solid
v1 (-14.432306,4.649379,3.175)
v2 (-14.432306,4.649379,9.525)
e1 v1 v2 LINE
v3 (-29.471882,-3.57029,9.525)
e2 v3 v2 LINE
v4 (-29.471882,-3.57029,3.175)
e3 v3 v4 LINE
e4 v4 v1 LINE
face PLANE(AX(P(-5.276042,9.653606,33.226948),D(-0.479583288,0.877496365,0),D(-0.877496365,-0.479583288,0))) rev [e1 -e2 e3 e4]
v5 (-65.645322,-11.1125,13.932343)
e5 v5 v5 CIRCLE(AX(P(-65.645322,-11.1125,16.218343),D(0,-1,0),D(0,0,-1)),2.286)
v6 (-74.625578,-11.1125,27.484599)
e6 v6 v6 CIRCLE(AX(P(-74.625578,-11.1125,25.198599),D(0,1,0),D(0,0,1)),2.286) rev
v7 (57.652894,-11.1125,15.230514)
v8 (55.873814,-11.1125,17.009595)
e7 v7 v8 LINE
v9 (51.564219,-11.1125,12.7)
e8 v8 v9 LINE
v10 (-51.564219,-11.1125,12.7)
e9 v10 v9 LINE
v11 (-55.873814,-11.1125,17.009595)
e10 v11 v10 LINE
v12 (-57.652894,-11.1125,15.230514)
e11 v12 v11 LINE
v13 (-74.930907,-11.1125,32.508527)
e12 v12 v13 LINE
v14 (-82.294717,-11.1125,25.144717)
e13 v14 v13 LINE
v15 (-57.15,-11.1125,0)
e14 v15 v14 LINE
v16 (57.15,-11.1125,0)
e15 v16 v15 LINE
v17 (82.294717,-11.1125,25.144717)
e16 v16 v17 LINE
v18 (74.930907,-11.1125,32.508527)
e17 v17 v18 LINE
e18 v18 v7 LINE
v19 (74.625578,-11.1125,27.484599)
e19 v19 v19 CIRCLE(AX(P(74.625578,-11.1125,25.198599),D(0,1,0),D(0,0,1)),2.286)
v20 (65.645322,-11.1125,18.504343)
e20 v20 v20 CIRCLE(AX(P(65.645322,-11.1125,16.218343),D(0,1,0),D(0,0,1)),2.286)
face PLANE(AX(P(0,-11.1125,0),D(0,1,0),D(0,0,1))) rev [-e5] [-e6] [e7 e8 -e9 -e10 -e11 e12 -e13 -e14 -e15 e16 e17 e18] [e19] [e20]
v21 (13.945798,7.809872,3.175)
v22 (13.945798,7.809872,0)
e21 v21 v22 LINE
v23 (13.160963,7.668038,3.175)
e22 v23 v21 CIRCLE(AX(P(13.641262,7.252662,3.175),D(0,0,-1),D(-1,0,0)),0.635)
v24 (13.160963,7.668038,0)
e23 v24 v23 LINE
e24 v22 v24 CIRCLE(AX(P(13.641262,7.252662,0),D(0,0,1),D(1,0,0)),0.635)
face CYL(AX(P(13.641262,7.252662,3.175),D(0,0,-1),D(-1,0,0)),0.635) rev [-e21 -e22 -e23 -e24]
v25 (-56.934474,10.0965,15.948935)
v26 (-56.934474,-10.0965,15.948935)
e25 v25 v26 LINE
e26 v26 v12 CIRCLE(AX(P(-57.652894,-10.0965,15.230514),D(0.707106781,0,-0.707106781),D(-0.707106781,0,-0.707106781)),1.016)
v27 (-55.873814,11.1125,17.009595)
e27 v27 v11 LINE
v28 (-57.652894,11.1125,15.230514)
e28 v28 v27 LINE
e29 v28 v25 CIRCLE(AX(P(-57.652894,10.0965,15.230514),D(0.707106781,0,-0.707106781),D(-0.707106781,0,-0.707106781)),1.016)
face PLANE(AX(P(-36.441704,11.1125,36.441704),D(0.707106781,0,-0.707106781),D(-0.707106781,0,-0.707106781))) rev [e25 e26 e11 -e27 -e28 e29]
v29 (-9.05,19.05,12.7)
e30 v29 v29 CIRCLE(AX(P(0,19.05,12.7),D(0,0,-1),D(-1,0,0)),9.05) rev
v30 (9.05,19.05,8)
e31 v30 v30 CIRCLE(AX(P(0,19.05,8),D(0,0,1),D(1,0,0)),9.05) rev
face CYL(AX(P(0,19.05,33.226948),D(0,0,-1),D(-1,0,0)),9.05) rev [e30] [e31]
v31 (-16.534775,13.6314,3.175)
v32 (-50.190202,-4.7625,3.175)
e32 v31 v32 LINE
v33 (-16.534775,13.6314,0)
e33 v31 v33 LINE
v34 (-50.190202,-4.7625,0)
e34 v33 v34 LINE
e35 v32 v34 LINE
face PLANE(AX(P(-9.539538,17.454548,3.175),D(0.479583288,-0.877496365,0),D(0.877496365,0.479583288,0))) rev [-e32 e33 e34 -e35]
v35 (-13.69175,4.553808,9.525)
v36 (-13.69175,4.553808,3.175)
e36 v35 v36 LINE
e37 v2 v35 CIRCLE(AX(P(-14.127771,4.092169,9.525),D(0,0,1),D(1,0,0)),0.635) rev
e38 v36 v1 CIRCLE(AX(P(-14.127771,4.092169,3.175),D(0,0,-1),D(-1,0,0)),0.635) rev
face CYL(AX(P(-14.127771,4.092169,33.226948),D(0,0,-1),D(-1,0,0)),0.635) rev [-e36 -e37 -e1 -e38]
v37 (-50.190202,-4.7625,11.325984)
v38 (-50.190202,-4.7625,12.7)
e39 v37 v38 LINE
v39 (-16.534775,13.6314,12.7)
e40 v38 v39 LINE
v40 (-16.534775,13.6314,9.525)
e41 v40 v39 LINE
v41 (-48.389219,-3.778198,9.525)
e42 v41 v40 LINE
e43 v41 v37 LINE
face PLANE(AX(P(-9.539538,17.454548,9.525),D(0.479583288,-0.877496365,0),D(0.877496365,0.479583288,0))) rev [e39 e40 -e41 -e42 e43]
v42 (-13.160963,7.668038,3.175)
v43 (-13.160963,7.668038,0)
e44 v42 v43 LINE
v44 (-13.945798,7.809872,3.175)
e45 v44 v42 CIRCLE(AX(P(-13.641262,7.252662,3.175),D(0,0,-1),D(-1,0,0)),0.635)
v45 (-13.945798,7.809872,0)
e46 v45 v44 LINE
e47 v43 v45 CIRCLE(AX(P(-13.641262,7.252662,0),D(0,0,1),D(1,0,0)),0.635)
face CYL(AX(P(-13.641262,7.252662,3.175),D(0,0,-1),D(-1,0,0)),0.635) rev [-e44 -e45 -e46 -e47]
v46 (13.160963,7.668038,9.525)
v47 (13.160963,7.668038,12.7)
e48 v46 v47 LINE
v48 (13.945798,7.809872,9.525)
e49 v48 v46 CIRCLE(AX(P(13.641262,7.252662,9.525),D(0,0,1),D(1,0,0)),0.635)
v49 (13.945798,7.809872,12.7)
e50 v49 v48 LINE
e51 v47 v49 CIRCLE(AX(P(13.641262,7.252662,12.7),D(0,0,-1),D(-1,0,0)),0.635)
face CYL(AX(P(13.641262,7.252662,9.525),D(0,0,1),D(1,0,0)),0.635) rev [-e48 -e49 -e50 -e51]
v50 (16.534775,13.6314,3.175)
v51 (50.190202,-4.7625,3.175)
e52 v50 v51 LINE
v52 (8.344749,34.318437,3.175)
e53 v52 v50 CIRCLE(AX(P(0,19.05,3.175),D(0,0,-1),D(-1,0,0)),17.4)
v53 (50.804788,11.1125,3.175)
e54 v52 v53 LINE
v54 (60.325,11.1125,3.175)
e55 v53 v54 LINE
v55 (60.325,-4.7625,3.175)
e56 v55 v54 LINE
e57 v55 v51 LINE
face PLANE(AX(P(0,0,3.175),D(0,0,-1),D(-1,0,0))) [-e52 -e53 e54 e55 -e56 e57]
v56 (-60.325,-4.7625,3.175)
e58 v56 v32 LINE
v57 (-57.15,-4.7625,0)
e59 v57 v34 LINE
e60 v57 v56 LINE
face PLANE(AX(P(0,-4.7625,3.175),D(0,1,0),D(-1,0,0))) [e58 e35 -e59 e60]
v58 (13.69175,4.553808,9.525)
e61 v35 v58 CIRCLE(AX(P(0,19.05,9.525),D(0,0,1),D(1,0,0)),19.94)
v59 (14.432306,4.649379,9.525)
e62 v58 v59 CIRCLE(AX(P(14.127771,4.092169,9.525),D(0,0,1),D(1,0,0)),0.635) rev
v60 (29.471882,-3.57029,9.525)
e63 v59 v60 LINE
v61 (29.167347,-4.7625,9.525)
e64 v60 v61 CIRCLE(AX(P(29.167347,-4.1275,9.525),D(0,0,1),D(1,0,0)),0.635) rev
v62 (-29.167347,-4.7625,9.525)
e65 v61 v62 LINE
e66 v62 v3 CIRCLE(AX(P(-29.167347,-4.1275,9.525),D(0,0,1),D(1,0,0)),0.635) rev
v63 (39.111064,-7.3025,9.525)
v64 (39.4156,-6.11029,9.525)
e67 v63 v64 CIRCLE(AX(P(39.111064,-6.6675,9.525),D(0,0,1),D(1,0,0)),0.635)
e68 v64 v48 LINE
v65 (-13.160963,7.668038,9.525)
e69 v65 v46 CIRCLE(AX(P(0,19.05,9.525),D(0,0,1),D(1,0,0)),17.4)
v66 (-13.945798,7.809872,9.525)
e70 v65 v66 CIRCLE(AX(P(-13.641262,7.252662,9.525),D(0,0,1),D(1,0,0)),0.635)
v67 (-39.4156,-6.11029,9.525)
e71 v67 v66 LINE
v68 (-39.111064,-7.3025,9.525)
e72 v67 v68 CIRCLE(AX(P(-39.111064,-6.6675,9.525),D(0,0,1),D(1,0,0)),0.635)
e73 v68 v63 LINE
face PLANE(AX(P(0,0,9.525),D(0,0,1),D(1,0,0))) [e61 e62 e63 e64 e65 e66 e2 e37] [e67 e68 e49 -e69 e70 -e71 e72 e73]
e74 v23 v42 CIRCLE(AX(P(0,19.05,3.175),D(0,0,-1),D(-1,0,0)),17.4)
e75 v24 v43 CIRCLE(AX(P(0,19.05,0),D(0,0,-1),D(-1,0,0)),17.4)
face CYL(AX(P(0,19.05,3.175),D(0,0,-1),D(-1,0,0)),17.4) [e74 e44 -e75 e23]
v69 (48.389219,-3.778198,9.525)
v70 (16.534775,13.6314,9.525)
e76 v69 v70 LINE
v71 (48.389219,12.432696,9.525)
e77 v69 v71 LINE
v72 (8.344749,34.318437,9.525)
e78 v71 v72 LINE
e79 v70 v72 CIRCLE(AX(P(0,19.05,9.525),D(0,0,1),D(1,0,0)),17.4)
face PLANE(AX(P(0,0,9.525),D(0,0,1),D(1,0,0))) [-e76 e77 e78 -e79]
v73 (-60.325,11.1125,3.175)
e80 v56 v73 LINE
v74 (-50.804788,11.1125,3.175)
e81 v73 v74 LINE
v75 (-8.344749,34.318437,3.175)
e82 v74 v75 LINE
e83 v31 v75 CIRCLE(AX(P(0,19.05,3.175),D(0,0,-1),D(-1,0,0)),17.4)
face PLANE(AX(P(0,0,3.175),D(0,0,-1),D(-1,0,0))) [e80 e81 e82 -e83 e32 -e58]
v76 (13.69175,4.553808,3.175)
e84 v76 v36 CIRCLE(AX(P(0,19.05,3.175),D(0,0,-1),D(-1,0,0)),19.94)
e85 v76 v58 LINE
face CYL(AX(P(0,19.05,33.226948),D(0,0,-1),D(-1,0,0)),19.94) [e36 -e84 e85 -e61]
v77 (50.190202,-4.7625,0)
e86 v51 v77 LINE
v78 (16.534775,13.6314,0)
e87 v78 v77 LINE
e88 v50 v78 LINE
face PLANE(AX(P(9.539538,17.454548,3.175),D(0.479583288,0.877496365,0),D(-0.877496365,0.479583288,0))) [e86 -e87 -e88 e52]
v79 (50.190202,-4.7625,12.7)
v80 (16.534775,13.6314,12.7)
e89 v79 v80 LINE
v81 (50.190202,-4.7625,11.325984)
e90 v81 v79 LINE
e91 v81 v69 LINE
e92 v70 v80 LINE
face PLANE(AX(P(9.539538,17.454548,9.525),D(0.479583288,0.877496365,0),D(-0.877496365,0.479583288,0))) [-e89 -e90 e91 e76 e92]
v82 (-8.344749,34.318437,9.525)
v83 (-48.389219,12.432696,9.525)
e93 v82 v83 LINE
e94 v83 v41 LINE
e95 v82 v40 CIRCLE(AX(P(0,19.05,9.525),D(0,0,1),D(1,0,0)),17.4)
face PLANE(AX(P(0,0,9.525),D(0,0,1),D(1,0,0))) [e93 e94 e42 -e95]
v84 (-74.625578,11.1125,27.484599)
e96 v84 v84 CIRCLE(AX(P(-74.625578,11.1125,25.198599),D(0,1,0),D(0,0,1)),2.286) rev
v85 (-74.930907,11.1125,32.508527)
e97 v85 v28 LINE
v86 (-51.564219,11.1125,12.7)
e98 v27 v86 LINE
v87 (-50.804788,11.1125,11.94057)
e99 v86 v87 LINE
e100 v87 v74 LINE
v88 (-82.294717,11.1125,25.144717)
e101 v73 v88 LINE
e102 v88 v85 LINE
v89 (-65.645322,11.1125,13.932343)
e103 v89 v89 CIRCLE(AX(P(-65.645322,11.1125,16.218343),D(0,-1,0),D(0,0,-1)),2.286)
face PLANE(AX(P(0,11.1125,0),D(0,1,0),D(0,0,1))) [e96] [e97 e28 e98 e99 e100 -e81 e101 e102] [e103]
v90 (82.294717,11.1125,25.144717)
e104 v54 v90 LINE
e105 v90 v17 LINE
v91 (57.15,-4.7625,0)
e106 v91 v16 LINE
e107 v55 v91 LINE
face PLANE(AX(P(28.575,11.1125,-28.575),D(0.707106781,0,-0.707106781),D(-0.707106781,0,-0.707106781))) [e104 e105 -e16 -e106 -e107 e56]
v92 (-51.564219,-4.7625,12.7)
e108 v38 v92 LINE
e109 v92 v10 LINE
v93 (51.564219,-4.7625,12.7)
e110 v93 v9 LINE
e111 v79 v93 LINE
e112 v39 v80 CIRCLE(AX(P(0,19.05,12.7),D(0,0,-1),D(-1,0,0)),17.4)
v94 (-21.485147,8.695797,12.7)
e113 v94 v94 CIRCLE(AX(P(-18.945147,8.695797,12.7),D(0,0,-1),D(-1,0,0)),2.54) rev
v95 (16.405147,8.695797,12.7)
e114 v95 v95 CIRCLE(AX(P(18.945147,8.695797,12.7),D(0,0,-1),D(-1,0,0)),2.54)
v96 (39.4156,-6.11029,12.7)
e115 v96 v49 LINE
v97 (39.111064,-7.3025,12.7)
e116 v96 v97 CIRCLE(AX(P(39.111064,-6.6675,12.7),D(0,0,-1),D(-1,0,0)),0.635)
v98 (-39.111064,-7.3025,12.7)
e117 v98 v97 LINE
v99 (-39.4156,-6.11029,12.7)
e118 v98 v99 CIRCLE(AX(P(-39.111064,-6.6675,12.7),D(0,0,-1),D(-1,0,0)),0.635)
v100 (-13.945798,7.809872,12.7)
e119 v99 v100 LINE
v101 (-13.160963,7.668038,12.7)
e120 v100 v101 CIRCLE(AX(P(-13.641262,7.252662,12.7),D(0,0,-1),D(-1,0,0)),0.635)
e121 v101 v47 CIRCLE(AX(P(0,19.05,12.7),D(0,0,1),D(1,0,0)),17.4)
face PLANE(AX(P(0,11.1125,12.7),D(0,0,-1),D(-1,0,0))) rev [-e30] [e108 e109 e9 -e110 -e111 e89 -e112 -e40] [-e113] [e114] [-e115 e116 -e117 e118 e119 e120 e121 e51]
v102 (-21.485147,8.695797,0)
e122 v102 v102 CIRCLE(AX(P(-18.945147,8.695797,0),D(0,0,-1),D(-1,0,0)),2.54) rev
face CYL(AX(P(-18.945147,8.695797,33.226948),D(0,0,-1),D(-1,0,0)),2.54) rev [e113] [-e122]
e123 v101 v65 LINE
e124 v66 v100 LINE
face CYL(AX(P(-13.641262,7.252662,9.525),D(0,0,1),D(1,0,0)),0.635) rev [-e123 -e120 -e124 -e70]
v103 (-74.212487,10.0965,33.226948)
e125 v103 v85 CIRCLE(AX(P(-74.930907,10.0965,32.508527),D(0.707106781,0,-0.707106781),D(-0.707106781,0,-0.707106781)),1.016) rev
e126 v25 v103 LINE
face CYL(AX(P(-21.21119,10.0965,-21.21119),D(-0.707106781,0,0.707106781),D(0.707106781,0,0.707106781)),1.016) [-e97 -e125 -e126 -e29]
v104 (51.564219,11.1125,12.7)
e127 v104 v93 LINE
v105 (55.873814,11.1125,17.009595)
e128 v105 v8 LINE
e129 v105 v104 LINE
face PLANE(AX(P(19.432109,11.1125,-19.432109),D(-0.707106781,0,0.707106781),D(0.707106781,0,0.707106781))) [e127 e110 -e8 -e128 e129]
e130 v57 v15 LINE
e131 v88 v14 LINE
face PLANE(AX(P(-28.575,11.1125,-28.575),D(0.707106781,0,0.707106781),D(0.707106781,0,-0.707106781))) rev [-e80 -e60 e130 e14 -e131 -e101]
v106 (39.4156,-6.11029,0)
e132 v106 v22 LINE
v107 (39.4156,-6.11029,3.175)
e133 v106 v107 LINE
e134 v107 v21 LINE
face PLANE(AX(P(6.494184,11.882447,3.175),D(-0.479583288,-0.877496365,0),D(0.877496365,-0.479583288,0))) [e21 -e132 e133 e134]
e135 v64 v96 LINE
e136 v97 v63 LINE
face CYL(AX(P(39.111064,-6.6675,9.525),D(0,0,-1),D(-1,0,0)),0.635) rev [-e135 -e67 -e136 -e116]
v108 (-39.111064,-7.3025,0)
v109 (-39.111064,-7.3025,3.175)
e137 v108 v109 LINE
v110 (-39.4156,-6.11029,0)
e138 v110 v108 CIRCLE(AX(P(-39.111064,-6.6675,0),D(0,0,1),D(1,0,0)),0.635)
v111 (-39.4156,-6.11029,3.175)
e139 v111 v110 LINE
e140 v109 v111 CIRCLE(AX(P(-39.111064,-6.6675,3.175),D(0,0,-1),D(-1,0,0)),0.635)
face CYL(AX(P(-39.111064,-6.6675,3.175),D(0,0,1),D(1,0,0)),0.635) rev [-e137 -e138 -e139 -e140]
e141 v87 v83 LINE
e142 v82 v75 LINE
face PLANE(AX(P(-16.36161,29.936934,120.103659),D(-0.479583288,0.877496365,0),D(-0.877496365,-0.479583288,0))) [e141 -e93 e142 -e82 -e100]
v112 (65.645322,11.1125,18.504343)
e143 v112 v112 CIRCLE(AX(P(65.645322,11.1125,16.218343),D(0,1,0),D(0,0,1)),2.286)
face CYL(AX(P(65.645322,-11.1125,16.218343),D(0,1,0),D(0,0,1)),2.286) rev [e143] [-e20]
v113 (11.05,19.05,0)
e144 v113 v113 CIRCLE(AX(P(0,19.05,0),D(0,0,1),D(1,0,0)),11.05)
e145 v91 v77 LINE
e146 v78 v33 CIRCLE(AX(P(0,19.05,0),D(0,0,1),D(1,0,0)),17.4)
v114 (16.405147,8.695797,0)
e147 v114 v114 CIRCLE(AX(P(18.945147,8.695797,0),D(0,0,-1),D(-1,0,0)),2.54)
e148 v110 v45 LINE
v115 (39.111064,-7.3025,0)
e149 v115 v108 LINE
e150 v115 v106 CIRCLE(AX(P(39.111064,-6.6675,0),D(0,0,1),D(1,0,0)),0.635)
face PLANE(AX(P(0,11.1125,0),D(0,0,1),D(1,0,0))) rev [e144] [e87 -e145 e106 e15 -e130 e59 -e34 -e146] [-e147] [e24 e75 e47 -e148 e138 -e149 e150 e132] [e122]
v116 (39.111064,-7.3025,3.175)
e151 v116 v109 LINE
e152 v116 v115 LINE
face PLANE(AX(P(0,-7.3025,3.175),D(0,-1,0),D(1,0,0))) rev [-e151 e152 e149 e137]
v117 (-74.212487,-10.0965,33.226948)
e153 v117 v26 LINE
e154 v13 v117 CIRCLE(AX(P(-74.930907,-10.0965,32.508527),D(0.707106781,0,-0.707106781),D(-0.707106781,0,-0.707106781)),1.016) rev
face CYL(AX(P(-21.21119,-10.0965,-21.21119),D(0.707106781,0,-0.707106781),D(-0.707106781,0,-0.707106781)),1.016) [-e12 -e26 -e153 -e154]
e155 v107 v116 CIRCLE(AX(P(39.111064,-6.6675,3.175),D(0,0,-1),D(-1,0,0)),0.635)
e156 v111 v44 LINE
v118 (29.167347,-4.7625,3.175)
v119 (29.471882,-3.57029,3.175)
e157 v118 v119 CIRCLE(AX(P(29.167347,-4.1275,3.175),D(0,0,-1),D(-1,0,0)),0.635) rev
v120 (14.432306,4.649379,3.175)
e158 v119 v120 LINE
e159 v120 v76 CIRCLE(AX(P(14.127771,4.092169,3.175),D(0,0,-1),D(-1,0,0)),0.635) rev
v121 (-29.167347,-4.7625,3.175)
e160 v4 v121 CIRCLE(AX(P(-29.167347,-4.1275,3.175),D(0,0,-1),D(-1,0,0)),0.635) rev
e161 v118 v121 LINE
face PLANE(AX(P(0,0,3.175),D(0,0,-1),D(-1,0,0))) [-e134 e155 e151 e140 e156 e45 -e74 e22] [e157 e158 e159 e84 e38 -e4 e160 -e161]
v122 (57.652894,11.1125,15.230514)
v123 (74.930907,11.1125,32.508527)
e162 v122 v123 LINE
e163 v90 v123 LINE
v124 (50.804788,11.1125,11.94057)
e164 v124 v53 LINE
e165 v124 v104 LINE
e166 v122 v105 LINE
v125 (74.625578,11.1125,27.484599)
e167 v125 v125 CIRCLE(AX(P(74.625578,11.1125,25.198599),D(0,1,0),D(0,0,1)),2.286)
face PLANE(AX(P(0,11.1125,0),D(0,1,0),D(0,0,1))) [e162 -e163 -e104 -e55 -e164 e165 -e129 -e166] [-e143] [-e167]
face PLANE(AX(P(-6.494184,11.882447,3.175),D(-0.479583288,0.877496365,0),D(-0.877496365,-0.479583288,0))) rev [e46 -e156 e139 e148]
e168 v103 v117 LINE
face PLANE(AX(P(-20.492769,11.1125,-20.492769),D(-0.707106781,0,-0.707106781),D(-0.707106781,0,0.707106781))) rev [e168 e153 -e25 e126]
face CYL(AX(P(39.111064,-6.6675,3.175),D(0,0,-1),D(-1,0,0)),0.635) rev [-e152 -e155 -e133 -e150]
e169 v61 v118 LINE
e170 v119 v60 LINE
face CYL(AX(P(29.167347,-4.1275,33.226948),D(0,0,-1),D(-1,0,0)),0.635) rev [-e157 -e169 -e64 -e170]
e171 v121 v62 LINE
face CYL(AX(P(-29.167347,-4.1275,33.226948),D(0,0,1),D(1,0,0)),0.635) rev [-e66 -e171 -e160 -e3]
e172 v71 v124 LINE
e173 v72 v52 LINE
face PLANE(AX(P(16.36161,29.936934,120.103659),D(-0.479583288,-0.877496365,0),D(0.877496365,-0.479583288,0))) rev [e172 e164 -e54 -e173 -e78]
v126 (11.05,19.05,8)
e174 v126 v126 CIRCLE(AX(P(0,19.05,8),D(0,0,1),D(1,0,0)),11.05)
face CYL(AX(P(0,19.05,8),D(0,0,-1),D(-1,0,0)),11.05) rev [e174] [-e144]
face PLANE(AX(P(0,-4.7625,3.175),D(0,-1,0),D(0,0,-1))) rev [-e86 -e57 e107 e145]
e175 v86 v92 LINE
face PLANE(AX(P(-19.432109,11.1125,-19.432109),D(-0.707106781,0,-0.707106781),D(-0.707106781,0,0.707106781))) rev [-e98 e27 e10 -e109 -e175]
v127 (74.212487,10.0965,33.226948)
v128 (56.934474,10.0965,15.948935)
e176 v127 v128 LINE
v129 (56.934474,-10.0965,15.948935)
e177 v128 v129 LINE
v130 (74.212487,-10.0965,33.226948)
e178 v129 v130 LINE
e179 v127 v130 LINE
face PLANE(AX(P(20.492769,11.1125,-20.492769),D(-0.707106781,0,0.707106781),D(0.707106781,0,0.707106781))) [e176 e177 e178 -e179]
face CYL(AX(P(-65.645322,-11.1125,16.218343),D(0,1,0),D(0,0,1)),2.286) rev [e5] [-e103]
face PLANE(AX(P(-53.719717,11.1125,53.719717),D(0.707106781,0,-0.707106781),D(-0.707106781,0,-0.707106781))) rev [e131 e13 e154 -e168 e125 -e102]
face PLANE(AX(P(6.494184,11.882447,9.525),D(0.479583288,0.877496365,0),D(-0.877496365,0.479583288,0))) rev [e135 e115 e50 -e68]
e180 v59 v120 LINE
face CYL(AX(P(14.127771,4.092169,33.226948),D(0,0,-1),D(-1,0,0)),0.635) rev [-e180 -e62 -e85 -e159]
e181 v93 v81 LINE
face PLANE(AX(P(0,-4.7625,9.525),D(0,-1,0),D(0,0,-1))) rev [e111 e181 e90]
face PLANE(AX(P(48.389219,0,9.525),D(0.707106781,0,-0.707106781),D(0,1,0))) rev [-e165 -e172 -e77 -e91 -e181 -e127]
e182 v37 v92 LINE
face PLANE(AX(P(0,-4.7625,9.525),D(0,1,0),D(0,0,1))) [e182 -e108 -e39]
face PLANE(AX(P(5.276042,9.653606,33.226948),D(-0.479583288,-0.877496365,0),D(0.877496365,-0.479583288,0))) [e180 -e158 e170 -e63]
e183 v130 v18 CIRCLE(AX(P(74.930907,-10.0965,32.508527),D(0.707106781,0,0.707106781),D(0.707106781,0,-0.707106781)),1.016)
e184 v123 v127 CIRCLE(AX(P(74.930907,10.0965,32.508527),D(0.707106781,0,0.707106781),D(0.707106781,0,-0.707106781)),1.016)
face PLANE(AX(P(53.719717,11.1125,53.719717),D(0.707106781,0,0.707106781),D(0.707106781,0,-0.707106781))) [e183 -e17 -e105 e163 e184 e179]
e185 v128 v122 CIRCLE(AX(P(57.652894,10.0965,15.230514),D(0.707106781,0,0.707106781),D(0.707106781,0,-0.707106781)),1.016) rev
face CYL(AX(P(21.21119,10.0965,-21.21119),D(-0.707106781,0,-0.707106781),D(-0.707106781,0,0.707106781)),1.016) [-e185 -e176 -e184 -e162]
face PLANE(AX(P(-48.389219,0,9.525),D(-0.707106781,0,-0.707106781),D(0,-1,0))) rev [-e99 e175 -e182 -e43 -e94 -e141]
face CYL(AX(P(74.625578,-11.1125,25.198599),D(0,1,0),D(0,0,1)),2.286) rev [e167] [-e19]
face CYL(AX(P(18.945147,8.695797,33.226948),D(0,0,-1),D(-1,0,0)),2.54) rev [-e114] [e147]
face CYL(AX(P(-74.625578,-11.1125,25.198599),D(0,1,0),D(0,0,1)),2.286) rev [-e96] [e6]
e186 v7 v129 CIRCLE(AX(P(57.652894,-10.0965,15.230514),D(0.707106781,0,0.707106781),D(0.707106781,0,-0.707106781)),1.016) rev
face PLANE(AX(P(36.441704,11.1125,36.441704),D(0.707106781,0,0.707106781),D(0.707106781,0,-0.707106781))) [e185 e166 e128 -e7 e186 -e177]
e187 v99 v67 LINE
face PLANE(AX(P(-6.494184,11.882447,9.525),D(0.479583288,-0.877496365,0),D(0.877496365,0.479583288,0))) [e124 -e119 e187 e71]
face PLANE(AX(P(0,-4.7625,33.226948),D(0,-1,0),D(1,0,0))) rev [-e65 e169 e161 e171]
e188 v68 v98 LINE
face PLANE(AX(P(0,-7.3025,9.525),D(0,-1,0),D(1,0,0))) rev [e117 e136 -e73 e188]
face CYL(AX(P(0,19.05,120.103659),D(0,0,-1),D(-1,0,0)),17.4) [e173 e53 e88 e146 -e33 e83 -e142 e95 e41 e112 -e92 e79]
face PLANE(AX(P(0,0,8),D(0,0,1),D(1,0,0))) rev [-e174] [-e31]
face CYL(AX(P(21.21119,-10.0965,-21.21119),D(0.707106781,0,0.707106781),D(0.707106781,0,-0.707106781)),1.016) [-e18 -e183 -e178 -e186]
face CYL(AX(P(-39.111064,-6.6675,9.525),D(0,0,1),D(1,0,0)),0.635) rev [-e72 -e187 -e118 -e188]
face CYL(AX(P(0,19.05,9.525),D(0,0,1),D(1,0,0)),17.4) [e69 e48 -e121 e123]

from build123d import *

# Parameters (mm, degrees)
BOSS_EXTRUDE1_DEPTH = 11.1125
BOSS_EXTRUDE2_DEPTH = 12.7
CUT_EXTRUDE2_DEPTH  = 8
CUT_EXTRUDE3_DEPTH  = 96.942967533
SKETCH5_W           = 25.144717139
SKETCH5_H           = 15.875
CUT_EXTRUDE4_DEPTH  = 3.175
CUT_EXTRUDE5_DEPTH  = 96.942967533
SKETCH6_R           = 2.54
CUT_EXTRUDE6_DEPTH  = 96.942967533
CUT_EXTRUDE7_START  = -3.175
CUT_EXTRUDE7_DEPTH  = 3.175
CHAMFER1_SIZE       = 3.175
FILLET1_R           = 0.635
FILLET3_R           = 1.016
SKETCH8_R           = 2.286
CUT_EXTRUDE8_DEPTH  = 93.295392221


with BuildPart() as part:
    # Sketch3 → Boss-Extrude1 (new, symmetric)
    with BuildSketch(Plane(origin=(0, 0, 0), x_dir=(1, 0, 0), z_dir=(0, 1, 0))):
        Polygon((-56.934473853, -15.948934871), (-65.016704362, -7.866704362), (-82.294717139, -25.144717139), (-74.93090712, -32.508527158), (-74.21248663, -33.226947648), align=None)
        Polygon((-65.016704362, -7.866704362), (-55.873813681, -17.009595043), (-52.371513794, -13.507295156), (-61.514404475, -4.364404475), align=None)
        Polygon((-52.371513794, -13.507295156), (-51.564218639, -12.7), (-17.311249955, -12.7), (0, -12.7), (0, 0), (-17.311249955, 0), (-57.15, 0), (-60.325, -3.175), (-61.514404475, -4.364404475), align=None)
        Polygon((0, 0), (0, -12.7), (17.311249955, -12.7), (51.564218639, -12.7), (52.371513794, -13.507295156), (61.514404475, -4.364404475), (60.325, -3.175), (57.15, 0), (17.311249955, 0), align=None)
        Polygon((61.514404475, -4.364404475), (65.016704362, -7.866704362), (55.873813681, -17.009595043), (52.371513794, -13.507295156), align=None)
        Polygon((65.016704362, -7.866704362), (56.934473853, -15.948934871), (74.21248663, -33.226947648), (74.93090712, -32.508527158), (82.294717139, -25.144717139), align=None)
    extrude(amount=BOSS_EXTRUDE1_DEPTH, both=True)

    # Sketch2 → Boss-Extrude2 (add)
    with BuildSketch(Plane.XY):
        with BuildLine():
            Line((-50.804788276, 11.1125), (50.804788276, 11.1125))
            Line((50.804788276, 11.1125), (8.344749207, 34.318436746))
            ThreePointArc((8.344749207, 34.318436746), (0, 36.45), (-8.344749207, 34.318436746))
            Line((-8.344749207, 34.318436746), (-50.804788276, 11.1125))
        make_face()
    extrude(amount=BOSS_EXTRUDE2_DEPTH)

    # Sketch2<3> → Cut-Extrude2 (cut)
    with BuildSketch(Plane.XY):
        with BuildLine():
            ThreePointArc((0, 30.1), (-11.05, 19.05), (0, 8))
            Line((0, 8), (0, 10))
            ThreePointArc((0, 10), (-9.05, 19.05), (0, 28.1))
            Line((0, 28.1), (0, 30.1))
        make_face()
        with BuildLine():
            Line((0, 10), (0, 8))
            ThreePointArc((0, 8), (7.813529932, 11.236470068), (11.05, 19.05))
            ThreePointArc((11.05, 19.05), (7.813529932, 26.863529932), (0, 30.1))
            Line((0, 30.1), (0, 28.1))
            ThreePointArc((0, 28.1), (6.39931637, 25.44931637), (9.05, 19.05))
            ThreePointArc((9.05, 19.05), (6.39931637, 12.65068363), (0, 10))
        make_face()
        with BuildLine():
            ThreePointArc((0, 28.1), (-9.05, 19.05), (0, 10))
            Line((0, 10), (0, 28.1))
        make_face()
        with BuildLine():
            Line((0, 28.1), (0, 10))
            ThreePointArc((0, 10), (6.39931637, 12.65068363), (9.05, 19.05))
            ThreePointArc((9.05, 19.05), (6.39931637, 25.44931637), (0, 28.1))
        make_face()
    extrude(amount=CUT_EXTRUDE2_DEPTH, mode=Mode.SUBTRACT)

    # Sketch2<5> → Cut-Extrude3 (cut, through all)
    with BuildSketch(Plane.XY):
        with BuildLine():
            ThreePointArc((0, 28.1), (-9.05, 19.05), (0, 10))
            Line((0, 10), (0, 28.1))
        make_face()
        with BuildLine():
            Line((0, 28.1), (0, 10))
            ThreePointArc((0, 10), (6.39931637, 12.65068363), (9.05, 19.05))
            ThreePointArc((9.05, 19.05), (6.39931637, 25.44931637), (0, 28.1))
        make_face()
    extrude(amount=CUT_EXTRUDE3_DEPTH, mode=Mode.SUBTRACT)

    # Sketch5 → Cut-Extrude4 (cut)
    # profile 1 of 5: a face of its own
    with BuildSketch(Plane(origin=(0, 0, 0), x_dir=(-1, 0, 0), z_dir=(0, 0, -1))):
        with Locations((-69.72235857, 3.175)):
            Rectangle(SKETCH5_W, SKETCH5_H)
    # profile 2 of 5: a face of its own
    with BuildSketch(Plane(origin=(0, 0, 0), x_dir=(-1, 0, 0), z_dir=(0, 0, -1))):
        with BuildLine():
            Line((-50.190202202, -4.7625), (-16.534774751, 13.631400187))
            ThreePointArc((-16.534774751, 13.631400187), (-16.178258512, 25.454994263), (-8.344749207, 34.318436746))
            Line((-8.344749207, 34.318436746), (-50.804788276, 11.1125))
            Line((-50.804788276, 11.1125), (-57.15, 11.1125))
            Line((-57.15, 11.1125), (-57.15, -4.7625))
            Line((-57.15, -4.7625), (-50.190202202, -4.7625))
        make_face()
    # profile 3 of 5: a face of its own
    with BuildSketch(Plane(origin=(0, 0, 0), x_dir=(-1, 0, 0), z_dir=(0, 0, -1))):
        with BuildLine():
            Line((50.804788276, 11.1125), (8.344749207, 34.318436746))
            ThreePointArc((8.344749207, 34.318436746), (14.965938597, 27.925848236), (17.4, 19.05))
            ThreePointArc((17.4, 19.05), (17.182332215, 16.306378367), (16.534774751, 13.631400187))
            Line((16.534774751, 13.631400187), (50.190202202, -4.7625))
            Line((50.190202202, -4.7625), (57.15, -4.7625))
            Line((57.15, -4.7625), (57.15, 11.1125))
            Line((57.15, 11.1125), (50.804788276, 11.1125))
        make_face()
    # profile 4 of 5: a face of its own
    with BuildSketch(Plane(origin=(0, 0, 0), x_dir=(-1, 0, 0), z_dir=(0, 0, -1))):
        with Locations((69.72235857, 3.175)):
            Rectangle(SKETCH5_W, SKETCH5_H)
    # profile 5 of 5: a face of its own
    with BuildSketch(Plane(origin=(0, 0, 0), x_dir=(-1, 0, 0), z_dir=(0, 0, -1))):
        with BuildLine():
            ThreePointArc((13.489420874, 8.059298271), (0, 1.65), (-13.489420874, 8.059298271))
            Line((-13.489420874, 8.059298271), (-41.5969936, -7.3025))
            Line((-41.5969936, -7.3025), (41.5969936, -7.3025))
            Line((41.5969936, -7.3025), (13.489420874, 8.059298271))
        make_face()
        with BuildLine():
            Line((31.653276027, -4.7625), (-31.653276027, -4.7625))
            Line((-31.653276027, -4.7625), (-14.022402602, 4.873405723))
            ThreePointArc((-14.022402602, 4.873405723), (0, -0.89), (14.022402602, 4.873405723))
            Line((14.022402602, 4.873405723), (31.653276027, -4.7625))
        make_face(mode=Mode.SUBTRACT)
    extrude(amount=-CUT_EXTRUDE4_DEPTH, mode=Mode.SUBTRACT)

    # Sketch5<3> → Cut-Extrude5 (cut, through all)
    with BuildSketch(Plane(origin=(0, 0, 0), x_dir=(-1, 0, 0), z_dir=(0, 0, -1))):
        with BuildLine():
            ThreePointArc((-14.022402602, 4.873405723), (0, -0.89), (14.022402602, 4.873405723))
            Line((14.022402602, 4.873405723), (31.653276027, -4.7625))
            Line((31.653276027, -4.7625), (-31.653276027, -4.7625))
            Line((-31.653276027, -4.7625), (-14.022402602, 4.873405723))
        make_face()
    extrude(amount=-CUT_EXTRUDE5_DEPTH, mode=Mode.SUBTRACT)

    # Sketch6 → Cut-Extrude6 (cut, through all)
    with BuildSketch(Plane(origin=(0, 0, 0), x_dir=(-1, 0, 0), z_dir=(0, 0, -1))):
        with Locations((-18.945146514, 8.695796817)):
            Circle(SKETCH6_R)
        with Locations((18.945146514, 8.695796817)):
            Circle(SKETCH6_R)
    extrude(amount=-CUT_EXTRUDE6_DEPTH, mode=Mode.SUBTRACT)

    # Sketch7 → Cut-Extrude7 (cut)
    # profile 1 of 3: a face of its own
    with BuildSketch(Plane.XY.offset(12.7).offset(CUT_EXTRUDE7_START)):
        with BuildLine():
            ThreePointArc((13.489420874, 8.059298271), (0, 1.65), (-13.489420874, 8.059298271))
            Line((-13.489420874, 8.059298271), (-41.5969936, -7.3025))
            Line((-41.5969936, -7.3025), (41.5969936, -7.3025))
            Line((41.5969936, -7.3025), (13.489420874, 8.059298271))
        make_face()
        with BuildLine():
            Line((-31.653276027, -4.7625), (-14.022402602, 4.873405723))
            ThreePointArc((-14.022402602, 4.873405723), (0, -0.89), (14.022402602, 4.873405723))
            Line((14.022402602, 4.873405723), (31.653276027, -4.7625))
            Line((31.653276027, -4.7625), (-31.653276027, -4.7625))
        make_face(mode=Mode.SUBTRACT)
    # profile 2 of 3: a face of its own
    with BuildSketch(Plane.XY.offset(12.7).offset(CUT_EXTRUDE7_START)):
        with BuildLine():
            Line((-51.564218639, -4.7625), (-50.190202202, -4.7625))
            Line((-50.190202202, -4.7625), (-16.534774751, 13.631400187))
            ThreePointArc((-16.534774751, 13.631400187), (-16.178258512, 25.454994263), (-8.344749207, 34.318436746))
            Line((-8.344749207, 34.318436746), (-50.804788276, 11.1125))
            Line((-50.804788276, 11.1125), (-51.564218639, 11.1125))
            Line((-51.564218639, 11.1125), (-51.564218639, -4.7625))
        make_face()
    # profile 3 of 3: a face of its own
    with BuildSketch(Plane.XY.offset(12.7).offset(CUT_EXTRUDE7_START)):
        with BuildLine():
            Line((50.804788276, 11.1125), (8.344749207, 34.318436746))
            ThreePointArc((8.344749207, 34.318436746), (14.965938597, 27.925848236), (17.4, 19.05))
            ThreePointArc((17.4, 19.05), (17.182332215, 16.306378367), (16.534774751, 13.631400187))
            Line((16.534774751, 13.631400187), (50.190202202, -4.7625))
            Line((50.190202202, -4.7625), (51.564218639, -4.7625))
            Line((51.564218639, -4.7625), (51.564218639, 11.1125))
            Line((51.564218639, 11.1125), (50.804788276, 11.1125))
        make_face()
    extrude(amount=CUT_EXTRUDE7_DEPTH, mode=Mode.SUBTRACT)

    # Chamfer1
    chamfer1_edges = [part.edges().sort_by_distance(p)[0] for p in [
        (51.564218639, 3.175, 9.525),
        (-51.564218639, 3.175, 9.525),
    ]]
    chamfer(chamfer1_edges, length=CHAMFER1_SIZE - 0.0001)  # a hair under: the kernel refuses the full size

    # Fillet1
    fillet1_edges = [part.edges().sort_by_distance(p)[0] for p in [
        (13.489420874, 8.059298271, 1.5875),
        (-13.489420874, 8.059298271, 1.5875),
        (-41.5969936, -7.3025, 1.5875),
        (41.5969936, -7.3025, 1.5875),
        (14.022402602, 4.873405723, 6.35),
        (31.653276027, -4.7625, 6.35),
        (-31.653276027, -4.7625, 6.35),
        (-14.022402602, 4.873405723, 6.35),
        (-13.489420874, 8.059298271, 11.1125),
        (13.489420874, 8.059298271, 11.1125),
        (41.5969936, -7.3025, 11.1125),
        (-41.5969936, -7.3025, 11.1125),
    ]]
    fillet(fillet1_edges, radius=FILLET1_R)

    # Fillet3
    fillet3_edges = [part.edges().sort_by_distance(p)[0] for p in [
        (65.573480242, -11.1125, 24.587941259),
        (-65.573480242, -11.1125, 24.587941259),
        (65.573480242, 11.1125, 24.587941259),
        (-65.573480242, 11.1125, 24.587941259),
    ]]
    fillet(fillet3_edges, radius=FILLET3_R)

    # Sketch8 → Cut-Extrude8 (cut, through all)
    with BuildSketch(Plane(origin=(0, 11.1125, 0), x_dir=(1, 0, 0), z_dir=(0, 1, 0))):
        with Locations(Location((74.625578412, -25.198598676, 0), (0, 0, 270))):
            Circle(SKETCH8_R)
        with Locations(Location((-74.625578412, -25.198598676, 0), (0, 0, 270))):
            Circle(SKETCH8_R)
        with Locations(Location((65.645322291, -16.218342555, 0), (0, 0, 270))):
            Circle(SKETCH8_R)
        with Locations(Location((-65.645322291, -16.218342555, 0), (0, 0, 90))):
            Circle(SKETCH8_R)
    extrude(amount=-CUT_EXTRUDE8_DEPTH, mode=Mode.SUBTRACT)


solid = part.part
